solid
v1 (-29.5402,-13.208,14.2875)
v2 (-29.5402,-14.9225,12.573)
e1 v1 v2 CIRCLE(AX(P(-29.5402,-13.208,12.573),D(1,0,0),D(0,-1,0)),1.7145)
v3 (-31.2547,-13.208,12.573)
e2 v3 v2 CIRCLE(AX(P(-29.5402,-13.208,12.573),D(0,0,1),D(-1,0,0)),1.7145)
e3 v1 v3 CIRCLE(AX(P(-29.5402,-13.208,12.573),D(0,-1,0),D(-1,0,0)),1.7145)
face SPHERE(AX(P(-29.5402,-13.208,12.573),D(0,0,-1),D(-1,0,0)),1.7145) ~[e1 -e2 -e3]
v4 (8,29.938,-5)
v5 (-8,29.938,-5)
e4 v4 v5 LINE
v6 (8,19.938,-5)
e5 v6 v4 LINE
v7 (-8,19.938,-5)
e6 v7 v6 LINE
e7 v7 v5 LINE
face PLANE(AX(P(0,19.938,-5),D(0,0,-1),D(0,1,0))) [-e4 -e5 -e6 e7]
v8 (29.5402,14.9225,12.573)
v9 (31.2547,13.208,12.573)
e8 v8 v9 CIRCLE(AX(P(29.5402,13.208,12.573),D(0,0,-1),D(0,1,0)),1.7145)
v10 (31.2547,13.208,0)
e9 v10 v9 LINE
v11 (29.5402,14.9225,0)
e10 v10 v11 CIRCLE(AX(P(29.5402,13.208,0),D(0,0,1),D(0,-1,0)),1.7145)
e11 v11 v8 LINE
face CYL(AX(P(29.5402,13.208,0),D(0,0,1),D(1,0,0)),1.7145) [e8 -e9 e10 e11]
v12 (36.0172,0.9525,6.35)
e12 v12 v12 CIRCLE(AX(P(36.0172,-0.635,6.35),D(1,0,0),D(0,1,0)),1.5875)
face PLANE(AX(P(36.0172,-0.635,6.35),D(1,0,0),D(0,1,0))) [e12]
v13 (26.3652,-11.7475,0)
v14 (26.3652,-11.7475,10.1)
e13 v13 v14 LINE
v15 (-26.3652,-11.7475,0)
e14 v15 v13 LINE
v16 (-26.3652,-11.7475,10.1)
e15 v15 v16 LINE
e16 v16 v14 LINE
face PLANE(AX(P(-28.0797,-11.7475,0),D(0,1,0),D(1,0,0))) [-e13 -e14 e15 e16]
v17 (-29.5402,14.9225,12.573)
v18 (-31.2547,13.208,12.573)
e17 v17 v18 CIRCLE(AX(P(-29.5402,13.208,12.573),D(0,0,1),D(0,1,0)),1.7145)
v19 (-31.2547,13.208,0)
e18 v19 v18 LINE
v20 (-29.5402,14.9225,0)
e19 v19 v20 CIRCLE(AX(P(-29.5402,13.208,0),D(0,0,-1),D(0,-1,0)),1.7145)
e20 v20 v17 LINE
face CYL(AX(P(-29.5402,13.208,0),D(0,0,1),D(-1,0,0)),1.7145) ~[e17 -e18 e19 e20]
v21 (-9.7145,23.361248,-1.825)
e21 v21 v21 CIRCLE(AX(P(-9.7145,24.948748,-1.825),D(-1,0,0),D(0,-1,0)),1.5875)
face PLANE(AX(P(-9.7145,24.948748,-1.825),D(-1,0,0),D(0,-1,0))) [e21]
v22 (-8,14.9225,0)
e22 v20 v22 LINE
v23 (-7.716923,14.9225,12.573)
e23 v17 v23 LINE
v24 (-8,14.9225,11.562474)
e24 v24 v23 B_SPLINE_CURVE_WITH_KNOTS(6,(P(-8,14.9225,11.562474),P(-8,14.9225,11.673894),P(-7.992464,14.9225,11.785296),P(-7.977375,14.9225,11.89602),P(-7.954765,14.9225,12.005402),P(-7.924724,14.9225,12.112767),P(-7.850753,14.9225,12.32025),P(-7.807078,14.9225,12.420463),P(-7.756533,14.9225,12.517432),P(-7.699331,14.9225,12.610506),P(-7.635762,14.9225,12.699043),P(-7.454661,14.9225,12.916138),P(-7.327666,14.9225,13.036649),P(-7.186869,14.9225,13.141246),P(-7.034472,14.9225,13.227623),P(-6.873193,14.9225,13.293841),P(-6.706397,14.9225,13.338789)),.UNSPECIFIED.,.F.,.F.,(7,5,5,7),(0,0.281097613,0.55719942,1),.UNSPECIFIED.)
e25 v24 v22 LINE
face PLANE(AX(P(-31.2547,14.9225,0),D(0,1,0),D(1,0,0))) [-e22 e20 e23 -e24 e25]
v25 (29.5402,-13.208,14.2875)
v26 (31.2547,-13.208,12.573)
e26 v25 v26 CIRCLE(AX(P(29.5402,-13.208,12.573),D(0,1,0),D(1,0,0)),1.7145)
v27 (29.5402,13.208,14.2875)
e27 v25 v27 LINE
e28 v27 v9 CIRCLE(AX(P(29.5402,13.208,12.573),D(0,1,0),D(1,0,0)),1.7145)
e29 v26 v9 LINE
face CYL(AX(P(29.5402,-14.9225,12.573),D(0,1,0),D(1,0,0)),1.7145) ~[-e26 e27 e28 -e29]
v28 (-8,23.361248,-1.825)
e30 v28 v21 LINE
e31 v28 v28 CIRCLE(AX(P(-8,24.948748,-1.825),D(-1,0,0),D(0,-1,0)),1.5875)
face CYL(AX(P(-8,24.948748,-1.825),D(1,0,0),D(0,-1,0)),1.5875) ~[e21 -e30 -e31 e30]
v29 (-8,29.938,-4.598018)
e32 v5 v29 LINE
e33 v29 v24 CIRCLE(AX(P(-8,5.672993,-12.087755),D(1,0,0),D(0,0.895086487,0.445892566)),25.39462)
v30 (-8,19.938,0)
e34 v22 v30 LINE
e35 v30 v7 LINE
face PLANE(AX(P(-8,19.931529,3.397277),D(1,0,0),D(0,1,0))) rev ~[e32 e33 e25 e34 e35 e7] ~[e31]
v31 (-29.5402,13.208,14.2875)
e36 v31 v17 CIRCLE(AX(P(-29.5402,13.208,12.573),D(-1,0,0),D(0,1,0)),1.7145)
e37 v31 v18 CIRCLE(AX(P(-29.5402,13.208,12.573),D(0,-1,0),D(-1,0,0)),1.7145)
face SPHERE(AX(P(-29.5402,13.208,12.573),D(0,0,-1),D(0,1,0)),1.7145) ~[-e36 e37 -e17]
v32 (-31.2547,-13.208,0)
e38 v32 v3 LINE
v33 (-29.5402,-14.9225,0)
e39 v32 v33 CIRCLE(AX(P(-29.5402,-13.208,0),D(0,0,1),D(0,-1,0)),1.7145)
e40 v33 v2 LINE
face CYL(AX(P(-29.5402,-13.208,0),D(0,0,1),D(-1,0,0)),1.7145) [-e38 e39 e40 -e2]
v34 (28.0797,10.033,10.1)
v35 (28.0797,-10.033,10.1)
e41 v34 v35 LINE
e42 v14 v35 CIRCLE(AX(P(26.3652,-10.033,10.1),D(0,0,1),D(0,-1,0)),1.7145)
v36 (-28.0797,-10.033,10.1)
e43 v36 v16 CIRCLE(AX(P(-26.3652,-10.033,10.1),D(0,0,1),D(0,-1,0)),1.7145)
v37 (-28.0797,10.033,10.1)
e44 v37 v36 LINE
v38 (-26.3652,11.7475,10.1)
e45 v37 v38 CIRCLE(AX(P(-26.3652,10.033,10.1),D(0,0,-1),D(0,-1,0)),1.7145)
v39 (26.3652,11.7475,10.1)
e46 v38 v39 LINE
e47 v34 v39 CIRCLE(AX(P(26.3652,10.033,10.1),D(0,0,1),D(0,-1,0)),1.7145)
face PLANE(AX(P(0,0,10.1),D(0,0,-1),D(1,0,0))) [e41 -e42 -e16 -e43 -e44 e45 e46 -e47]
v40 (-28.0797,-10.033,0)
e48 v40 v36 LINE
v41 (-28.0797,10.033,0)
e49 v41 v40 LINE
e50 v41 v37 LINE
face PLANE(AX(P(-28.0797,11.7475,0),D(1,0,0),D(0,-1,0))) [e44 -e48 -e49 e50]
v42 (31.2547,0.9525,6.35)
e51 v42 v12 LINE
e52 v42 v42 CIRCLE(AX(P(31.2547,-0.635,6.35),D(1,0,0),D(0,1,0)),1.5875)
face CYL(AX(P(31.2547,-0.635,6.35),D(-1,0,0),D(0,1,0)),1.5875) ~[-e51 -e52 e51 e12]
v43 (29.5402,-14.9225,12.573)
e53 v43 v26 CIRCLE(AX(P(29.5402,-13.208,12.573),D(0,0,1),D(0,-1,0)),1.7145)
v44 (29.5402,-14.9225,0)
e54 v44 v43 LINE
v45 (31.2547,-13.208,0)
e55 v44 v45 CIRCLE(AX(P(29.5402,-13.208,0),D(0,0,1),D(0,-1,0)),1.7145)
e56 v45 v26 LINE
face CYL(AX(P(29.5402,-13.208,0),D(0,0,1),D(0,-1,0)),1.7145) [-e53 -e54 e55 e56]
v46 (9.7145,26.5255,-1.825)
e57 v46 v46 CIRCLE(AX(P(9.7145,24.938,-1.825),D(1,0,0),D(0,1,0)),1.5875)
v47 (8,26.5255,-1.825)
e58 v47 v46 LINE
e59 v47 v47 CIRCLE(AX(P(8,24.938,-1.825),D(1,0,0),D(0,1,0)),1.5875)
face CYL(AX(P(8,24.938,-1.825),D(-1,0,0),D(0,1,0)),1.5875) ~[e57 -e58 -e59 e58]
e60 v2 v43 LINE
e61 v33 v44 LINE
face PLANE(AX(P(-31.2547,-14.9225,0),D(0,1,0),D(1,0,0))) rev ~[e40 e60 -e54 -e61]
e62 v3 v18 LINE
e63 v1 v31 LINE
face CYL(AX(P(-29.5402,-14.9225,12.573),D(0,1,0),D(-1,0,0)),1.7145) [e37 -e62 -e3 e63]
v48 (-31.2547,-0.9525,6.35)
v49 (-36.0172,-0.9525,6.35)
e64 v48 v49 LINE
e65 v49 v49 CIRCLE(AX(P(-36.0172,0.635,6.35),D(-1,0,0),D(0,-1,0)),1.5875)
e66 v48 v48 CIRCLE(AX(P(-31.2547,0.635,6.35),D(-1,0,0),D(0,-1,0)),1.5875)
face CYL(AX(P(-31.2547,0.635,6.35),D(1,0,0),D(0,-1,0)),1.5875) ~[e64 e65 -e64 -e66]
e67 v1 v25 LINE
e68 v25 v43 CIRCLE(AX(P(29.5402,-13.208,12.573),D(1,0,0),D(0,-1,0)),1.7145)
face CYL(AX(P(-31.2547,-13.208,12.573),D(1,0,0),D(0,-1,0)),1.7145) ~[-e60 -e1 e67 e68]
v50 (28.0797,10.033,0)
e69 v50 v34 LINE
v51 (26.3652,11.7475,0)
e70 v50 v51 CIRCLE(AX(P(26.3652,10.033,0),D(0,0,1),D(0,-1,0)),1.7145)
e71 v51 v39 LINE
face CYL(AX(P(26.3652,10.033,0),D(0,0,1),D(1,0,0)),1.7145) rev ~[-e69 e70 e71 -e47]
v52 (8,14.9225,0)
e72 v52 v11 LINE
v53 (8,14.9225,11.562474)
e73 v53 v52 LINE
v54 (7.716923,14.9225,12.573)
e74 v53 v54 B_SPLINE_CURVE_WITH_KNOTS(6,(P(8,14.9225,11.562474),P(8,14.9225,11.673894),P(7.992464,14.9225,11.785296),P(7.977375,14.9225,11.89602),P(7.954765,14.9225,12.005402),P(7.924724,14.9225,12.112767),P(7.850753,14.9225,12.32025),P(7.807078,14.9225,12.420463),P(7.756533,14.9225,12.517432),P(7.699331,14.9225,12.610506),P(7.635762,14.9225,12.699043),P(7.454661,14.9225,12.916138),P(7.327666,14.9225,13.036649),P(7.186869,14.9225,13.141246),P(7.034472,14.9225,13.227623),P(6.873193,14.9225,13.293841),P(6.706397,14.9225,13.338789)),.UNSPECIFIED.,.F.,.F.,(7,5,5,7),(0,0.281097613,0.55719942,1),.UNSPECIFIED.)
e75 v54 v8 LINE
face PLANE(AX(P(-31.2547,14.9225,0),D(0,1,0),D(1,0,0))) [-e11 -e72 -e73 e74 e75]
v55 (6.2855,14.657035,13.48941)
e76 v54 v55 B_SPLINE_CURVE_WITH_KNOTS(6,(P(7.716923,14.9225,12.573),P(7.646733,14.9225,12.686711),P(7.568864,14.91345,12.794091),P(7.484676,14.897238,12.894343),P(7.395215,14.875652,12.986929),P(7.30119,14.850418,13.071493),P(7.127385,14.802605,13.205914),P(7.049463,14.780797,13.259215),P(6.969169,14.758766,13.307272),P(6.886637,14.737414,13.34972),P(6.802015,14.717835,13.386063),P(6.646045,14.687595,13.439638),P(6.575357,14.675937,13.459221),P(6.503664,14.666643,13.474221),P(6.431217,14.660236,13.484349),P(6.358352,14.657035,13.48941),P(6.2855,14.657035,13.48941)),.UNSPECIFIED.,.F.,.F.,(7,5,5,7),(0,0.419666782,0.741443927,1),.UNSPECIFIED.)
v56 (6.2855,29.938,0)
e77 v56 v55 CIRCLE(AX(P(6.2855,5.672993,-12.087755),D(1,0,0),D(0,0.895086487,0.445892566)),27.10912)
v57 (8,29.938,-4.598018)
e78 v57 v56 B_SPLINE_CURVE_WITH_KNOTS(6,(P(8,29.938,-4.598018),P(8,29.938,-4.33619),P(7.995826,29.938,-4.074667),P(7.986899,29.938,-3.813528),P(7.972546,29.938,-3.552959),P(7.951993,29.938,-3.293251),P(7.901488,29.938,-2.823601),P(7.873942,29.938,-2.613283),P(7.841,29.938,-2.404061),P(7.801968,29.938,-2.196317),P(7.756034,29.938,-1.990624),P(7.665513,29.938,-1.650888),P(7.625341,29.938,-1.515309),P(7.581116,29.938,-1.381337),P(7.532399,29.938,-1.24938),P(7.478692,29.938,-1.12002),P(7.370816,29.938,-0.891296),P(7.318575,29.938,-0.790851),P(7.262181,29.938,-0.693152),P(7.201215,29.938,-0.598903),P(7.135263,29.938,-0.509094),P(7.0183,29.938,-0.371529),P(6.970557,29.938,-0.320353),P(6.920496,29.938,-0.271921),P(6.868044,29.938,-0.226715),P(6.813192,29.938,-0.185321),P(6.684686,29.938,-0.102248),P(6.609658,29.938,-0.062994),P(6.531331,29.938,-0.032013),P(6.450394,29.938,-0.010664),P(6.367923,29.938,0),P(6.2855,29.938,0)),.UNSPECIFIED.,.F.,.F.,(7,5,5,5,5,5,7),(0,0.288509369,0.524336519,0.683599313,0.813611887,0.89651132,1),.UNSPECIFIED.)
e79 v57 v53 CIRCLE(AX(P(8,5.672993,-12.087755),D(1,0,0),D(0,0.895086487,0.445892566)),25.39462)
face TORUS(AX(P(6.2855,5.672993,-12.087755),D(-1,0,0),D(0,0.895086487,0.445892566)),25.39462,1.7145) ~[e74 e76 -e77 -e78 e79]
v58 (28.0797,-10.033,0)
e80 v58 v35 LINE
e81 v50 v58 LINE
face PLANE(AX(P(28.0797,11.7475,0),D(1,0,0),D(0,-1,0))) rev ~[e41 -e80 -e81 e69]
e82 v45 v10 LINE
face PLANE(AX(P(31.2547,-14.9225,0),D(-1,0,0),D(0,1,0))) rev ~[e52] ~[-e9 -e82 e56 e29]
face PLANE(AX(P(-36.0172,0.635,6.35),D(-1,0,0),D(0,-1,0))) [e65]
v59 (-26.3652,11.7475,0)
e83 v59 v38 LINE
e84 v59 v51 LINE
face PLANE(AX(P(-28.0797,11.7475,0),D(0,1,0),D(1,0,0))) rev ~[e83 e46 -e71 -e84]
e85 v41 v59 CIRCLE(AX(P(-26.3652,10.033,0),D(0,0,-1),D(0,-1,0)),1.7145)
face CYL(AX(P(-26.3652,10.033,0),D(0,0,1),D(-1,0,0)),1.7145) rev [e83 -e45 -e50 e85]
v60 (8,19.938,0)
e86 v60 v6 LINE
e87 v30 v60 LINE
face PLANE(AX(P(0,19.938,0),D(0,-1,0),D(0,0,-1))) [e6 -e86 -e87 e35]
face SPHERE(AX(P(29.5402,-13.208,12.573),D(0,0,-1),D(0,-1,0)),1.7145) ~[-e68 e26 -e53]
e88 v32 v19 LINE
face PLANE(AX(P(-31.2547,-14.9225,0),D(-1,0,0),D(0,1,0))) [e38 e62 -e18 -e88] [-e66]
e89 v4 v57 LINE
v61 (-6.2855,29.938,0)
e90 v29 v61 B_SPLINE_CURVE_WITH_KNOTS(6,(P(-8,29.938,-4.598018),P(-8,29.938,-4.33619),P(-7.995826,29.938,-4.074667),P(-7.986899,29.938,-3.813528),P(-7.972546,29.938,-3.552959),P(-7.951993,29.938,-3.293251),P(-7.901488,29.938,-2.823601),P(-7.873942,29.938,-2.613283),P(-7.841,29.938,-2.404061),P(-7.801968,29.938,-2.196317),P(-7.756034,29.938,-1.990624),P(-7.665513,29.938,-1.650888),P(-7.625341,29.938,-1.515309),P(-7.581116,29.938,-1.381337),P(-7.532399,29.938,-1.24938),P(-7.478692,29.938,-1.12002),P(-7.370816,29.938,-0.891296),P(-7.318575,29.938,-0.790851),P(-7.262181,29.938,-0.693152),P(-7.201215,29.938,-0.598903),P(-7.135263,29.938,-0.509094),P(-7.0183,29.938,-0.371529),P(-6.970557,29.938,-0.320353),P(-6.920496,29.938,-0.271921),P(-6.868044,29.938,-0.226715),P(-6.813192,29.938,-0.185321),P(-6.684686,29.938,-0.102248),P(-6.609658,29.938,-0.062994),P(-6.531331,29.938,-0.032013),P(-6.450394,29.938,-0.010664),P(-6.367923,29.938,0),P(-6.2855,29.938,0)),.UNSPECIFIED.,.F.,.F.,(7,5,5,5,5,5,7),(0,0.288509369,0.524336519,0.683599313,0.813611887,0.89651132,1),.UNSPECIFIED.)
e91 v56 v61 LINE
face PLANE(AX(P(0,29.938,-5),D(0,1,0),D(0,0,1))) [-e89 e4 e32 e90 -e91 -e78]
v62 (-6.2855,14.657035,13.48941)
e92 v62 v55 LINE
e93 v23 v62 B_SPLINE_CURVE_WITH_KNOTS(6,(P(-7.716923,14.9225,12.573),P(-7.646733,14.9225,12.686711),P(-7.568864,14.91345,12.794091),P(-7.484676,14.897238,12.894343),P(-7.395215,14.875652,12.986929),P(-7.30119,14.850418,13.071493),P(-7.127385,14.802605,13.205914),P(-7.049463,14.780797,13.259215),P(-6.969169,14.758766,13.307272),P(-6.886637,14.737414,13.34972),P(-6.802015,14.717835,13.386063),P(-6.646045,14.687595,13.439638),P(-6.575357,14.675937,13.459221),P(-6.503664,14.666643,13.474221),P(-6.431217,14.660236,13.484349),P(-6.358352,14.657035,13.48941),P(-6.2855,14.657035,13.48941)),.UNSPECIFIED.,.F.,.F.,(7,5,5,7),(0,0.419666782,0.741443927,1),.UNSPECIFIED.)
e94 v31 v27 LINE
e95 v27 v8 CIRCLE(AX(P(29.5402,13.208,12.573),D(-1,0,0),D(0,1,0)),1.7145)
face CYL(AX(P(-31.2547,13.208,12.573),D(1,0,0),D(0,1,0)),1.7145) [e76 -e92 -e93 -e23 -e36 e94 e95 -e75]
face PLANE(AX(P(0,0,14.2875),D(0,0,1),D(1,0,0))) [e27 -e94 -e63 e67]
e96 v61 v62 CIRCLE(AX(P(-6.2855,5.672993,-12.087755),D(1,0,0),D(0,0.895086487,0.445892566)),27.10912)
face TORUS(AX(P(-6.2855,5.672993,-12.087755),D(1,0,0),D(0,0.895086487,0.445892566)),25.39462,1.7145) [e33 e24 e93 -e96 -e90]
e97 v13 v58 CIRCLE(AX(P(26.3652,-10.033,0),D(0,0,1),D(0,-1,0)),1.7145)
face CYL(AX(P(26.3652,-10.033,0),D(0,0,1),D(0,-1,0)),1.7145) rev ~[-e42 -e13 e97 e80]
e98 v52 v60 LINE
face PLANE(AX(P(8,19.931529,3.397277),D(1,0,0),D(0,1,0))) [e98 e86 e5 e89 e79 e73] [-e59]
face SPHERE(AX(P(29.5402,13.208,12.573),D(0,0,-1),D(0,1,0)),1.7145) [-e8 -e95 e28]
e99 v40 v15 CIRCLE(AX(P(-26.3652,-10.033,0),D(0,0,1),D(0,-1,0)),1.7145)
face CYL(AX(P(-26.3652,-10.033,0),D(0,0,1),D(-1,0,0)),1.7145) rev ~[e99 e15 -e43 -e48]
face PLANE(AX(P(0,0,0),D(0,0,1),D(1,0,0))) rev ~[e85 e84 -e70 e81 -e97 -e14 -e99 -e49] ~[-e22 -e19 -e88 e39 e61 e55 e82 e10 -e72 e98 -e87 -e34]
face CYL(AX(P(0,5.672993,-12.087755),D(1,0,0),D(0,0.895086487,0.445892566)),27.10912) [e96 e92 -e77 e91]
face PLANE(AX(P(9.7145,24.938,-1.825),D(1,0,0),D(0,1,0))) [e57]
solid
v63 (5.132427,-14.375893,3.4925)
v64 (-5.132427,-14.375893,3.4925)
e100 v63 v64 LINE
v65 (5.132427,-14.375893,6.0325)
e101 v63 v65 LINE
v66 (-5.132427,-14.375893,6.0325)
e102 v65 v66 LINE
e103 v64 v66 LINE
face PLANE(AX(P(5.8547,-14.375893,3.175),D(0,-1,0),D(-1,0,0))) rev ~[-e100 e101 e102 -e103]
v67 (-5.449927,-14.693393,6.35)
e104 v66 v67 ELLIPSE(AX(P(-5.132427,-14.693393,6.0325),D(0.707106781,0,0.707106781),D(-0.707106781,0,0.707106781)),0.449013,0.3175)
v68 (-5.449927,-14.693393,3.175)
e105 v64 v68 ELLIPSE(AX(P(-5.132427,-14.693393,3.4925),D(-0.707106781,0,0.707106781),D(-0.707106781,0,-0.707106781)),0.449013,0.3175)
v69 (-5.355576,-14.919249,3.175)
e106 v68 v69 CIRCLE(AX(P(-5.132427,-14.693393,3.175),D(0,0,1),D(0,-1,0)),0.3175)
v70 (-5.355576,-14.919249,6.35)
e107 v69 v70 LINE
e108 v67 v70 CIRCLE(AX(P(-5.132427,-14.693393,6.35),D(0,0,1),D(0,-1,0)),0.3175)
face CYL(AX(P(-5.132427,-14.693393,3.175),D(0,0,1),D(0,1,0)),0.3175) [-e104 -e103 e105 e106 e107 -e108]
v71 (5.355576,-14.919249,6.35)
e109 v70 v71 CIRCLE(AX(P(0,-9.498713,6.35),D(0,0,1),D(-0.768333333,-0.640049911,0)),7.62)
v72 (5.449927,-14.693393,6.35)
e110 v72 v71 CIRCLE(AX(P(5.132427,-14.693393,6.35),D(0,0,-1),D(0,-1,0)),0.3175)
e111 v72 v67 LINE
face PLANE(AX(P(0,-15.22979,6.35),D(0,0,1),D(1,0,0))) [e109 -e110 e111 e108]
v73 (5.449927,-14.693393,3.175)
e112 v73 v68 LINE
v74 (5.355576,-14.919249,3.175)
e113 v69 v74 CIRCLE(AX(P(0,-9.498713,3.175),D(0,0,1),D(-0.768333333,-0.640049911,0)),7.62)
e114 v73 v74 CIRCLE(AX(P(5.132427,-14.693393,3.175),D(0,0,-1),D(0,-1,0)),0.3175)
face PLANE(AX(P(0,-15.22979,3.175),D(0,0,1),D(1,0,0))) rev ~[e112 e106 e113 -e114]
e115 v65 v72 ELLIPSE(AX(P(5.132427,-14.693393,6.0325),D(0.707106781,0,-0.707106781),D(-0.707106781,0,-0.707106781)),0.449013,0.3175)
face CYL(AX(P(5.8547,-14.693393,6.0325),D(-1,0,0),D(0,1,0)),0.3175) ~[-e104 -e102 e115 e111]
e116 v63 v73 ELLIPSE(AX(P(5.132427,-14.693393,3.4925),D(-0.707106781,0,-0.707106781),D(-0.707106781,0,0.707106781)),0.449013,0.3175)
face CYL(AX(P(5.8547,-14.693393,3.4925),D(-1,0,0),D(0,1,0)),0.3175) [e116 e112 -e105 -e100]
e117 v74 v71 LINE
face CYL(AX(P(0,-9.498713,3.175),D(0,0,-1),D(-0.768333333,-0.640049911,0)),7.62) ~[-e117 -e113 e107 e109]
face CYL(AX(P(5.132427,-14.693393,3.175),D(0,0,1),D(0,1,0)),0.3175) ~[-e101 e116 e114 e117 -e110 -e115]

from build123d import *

# Parameters (mm, degrees)
F0_W      = 62.5094
F0_H      = 29.845
F1_DEPTH  = 14.2875
F4_DEPTH  = 3.175
F5_R      = 0.3175
F6_R      = 1.7145
F7_W      = 56.1594
F7_H      = 23.495
F8_DEPTH  = 10.1
F9_R      = 1.7145
F10_R     = 1.5875
F11_DEPTH = 4.7625
F12_R     = 1.5875
F13_DEPTH = 4.7625
F15_DEPTH = 8
F16_R     = 1.7145
F17_R     = 1.5875
F18_DEPTH = 1.7145
F19_R     = 1.5875
F20_DEPTH = 1.7145


with BuildPart() as f1:
    # F0 (on Top) → F1 (new body)
    with BuildSketch(Plane.XY):
        Rectangle(F0_W, F0_H)
    extrude(amount=F1_DEPTH)

    # F6
    f6_edges = [f1.edges().sort_by_distance(p)[0] for p in [
        (-31.2547, -14.9225, 7.14375),
        (31.2547, -14.9225, 7.14375),
        (31.2547, 14.9225, 7.14375),
        (-31.2547, 14.9225, 7.14375),
        (0, 14.9225, 14.2875),
        (-31.2547, 0, 14.2875),
        (0, -14.9225, 14.2875),
        (31.2547, 0, 14.2875),
    ]]
    fillet(f6_edges, radius=F6_R)

    # F7 (on face) → F8 (cut)
    with BuildSketch(Plane(origin=(0, 0, 0), x_dir=(1, 0, 0), z_dir=(0, 0, -1))):
        Rectangle(F7_W, F7_H)
    extrude(amount=-F8_DEPTH, mode=Mode.SUBTRACT)

    # F9
    f9_edges = [f1.edges().sort_by_distance(p)[0] for p in [
        (-28.0797, 11.7475, 5.05),
        (-28.0797, -11.7475, 5.05),
        (28.0797, -11.7475, 5.05),
        (28.0797, 11.7475, 5.05),
    ]]
    fillet(f9_edges, radius=F9_R)

    # F10 (on face) → F11 (join)
    with BuildSketch(Plane.YZ.offset(31.2547)):
        with Locations((-0.635, 6.35)):
            Circle(F10_R)
    extrude(amount=F11_DEPTH)

    # F12 (on face) → F13 (join)
    with BuildSketch(Plane(origin=(-31.2547, 0, 0), x_dir=(0, -1, 0), z_dir=(-1, 0, 0))):
        with Locations((-0.635, 6.35)):
            Circle(F12_R)
    extrude(amount=F13_DEPTH)

    # F14 (on Right) → F15 (join, symmetric)
    with BuildSketch(Plane.YZ):
        with BuildLine():
            Line((11.938, 14.2875), (11.938, 0))
            Line((11.938, 0), (19.938, 0))
            Line((19.938, 0), (19.938, -5))
            Line((19.938, -5), (29.938, -5))
            Line((29.938, -5), (29.938, 0))
            ThreePointArc((29.938, 0), (22.5268828144, 9.1454921283), (11.938, 14.2875))
        make_face()
    extrude(amount=F15_DEPTH, both=True)

    # F16
    f16_edges = [f1.edges().sort_by_distance(p)[0] for p in [
        (8, 23.613613, 8.235594),
        (-8, 23.613613, 8.235594),
    ]]
    fillet(f16_edges, radius=F16_R)

    # F17 (on face) → F18 (join)
    with BuildSketch(Plane.YZ.offset(8)):
        with Locations((24.938, -1.825)):
            Circle(F17_R)
    extrude(amount=F18_DEPTH)

    # F19 (on face) → F20 (join)
    with BuildSketch(Plane(origin=(-8, 0, 0), x_dir=(0, -1, 0), z_dir=(-1, 0, 0))):
        with Locations((-24.9487477744, -1.825)):
            Circle(F19_R)
    extrude(amount=F20_DEPTH)


with BuildPart() as f4:
    # F3 (on offset) → F4 (new body)
    with BuildSketch(Plane.XY.offset(3.175)):
        with BuildLine():
            Line((5.8547, -14.3758933991), (-5.8547, -14.3758933991))
            ThreePointArc((-5.8547, -14.3758933991), (0, -17.1187130754), (5.8547, -14.3758933991))
        make_face()
    extrude(amount=F4_DEPTH)

    # F5
    f5_edges = [f4.edges().sort_by_distance(p)[0] for p in [
        (-5.8547, -14.375893, 4.7625),
        (0, -14.375893, 6.35),
        (0, -14.375893, 3.175),
        (5.8547, -14.375893, 4.7625),
    ]]
    fillet(f5_edges, radius=F5_R)


solid = Compound([f1.part, f4.part])
